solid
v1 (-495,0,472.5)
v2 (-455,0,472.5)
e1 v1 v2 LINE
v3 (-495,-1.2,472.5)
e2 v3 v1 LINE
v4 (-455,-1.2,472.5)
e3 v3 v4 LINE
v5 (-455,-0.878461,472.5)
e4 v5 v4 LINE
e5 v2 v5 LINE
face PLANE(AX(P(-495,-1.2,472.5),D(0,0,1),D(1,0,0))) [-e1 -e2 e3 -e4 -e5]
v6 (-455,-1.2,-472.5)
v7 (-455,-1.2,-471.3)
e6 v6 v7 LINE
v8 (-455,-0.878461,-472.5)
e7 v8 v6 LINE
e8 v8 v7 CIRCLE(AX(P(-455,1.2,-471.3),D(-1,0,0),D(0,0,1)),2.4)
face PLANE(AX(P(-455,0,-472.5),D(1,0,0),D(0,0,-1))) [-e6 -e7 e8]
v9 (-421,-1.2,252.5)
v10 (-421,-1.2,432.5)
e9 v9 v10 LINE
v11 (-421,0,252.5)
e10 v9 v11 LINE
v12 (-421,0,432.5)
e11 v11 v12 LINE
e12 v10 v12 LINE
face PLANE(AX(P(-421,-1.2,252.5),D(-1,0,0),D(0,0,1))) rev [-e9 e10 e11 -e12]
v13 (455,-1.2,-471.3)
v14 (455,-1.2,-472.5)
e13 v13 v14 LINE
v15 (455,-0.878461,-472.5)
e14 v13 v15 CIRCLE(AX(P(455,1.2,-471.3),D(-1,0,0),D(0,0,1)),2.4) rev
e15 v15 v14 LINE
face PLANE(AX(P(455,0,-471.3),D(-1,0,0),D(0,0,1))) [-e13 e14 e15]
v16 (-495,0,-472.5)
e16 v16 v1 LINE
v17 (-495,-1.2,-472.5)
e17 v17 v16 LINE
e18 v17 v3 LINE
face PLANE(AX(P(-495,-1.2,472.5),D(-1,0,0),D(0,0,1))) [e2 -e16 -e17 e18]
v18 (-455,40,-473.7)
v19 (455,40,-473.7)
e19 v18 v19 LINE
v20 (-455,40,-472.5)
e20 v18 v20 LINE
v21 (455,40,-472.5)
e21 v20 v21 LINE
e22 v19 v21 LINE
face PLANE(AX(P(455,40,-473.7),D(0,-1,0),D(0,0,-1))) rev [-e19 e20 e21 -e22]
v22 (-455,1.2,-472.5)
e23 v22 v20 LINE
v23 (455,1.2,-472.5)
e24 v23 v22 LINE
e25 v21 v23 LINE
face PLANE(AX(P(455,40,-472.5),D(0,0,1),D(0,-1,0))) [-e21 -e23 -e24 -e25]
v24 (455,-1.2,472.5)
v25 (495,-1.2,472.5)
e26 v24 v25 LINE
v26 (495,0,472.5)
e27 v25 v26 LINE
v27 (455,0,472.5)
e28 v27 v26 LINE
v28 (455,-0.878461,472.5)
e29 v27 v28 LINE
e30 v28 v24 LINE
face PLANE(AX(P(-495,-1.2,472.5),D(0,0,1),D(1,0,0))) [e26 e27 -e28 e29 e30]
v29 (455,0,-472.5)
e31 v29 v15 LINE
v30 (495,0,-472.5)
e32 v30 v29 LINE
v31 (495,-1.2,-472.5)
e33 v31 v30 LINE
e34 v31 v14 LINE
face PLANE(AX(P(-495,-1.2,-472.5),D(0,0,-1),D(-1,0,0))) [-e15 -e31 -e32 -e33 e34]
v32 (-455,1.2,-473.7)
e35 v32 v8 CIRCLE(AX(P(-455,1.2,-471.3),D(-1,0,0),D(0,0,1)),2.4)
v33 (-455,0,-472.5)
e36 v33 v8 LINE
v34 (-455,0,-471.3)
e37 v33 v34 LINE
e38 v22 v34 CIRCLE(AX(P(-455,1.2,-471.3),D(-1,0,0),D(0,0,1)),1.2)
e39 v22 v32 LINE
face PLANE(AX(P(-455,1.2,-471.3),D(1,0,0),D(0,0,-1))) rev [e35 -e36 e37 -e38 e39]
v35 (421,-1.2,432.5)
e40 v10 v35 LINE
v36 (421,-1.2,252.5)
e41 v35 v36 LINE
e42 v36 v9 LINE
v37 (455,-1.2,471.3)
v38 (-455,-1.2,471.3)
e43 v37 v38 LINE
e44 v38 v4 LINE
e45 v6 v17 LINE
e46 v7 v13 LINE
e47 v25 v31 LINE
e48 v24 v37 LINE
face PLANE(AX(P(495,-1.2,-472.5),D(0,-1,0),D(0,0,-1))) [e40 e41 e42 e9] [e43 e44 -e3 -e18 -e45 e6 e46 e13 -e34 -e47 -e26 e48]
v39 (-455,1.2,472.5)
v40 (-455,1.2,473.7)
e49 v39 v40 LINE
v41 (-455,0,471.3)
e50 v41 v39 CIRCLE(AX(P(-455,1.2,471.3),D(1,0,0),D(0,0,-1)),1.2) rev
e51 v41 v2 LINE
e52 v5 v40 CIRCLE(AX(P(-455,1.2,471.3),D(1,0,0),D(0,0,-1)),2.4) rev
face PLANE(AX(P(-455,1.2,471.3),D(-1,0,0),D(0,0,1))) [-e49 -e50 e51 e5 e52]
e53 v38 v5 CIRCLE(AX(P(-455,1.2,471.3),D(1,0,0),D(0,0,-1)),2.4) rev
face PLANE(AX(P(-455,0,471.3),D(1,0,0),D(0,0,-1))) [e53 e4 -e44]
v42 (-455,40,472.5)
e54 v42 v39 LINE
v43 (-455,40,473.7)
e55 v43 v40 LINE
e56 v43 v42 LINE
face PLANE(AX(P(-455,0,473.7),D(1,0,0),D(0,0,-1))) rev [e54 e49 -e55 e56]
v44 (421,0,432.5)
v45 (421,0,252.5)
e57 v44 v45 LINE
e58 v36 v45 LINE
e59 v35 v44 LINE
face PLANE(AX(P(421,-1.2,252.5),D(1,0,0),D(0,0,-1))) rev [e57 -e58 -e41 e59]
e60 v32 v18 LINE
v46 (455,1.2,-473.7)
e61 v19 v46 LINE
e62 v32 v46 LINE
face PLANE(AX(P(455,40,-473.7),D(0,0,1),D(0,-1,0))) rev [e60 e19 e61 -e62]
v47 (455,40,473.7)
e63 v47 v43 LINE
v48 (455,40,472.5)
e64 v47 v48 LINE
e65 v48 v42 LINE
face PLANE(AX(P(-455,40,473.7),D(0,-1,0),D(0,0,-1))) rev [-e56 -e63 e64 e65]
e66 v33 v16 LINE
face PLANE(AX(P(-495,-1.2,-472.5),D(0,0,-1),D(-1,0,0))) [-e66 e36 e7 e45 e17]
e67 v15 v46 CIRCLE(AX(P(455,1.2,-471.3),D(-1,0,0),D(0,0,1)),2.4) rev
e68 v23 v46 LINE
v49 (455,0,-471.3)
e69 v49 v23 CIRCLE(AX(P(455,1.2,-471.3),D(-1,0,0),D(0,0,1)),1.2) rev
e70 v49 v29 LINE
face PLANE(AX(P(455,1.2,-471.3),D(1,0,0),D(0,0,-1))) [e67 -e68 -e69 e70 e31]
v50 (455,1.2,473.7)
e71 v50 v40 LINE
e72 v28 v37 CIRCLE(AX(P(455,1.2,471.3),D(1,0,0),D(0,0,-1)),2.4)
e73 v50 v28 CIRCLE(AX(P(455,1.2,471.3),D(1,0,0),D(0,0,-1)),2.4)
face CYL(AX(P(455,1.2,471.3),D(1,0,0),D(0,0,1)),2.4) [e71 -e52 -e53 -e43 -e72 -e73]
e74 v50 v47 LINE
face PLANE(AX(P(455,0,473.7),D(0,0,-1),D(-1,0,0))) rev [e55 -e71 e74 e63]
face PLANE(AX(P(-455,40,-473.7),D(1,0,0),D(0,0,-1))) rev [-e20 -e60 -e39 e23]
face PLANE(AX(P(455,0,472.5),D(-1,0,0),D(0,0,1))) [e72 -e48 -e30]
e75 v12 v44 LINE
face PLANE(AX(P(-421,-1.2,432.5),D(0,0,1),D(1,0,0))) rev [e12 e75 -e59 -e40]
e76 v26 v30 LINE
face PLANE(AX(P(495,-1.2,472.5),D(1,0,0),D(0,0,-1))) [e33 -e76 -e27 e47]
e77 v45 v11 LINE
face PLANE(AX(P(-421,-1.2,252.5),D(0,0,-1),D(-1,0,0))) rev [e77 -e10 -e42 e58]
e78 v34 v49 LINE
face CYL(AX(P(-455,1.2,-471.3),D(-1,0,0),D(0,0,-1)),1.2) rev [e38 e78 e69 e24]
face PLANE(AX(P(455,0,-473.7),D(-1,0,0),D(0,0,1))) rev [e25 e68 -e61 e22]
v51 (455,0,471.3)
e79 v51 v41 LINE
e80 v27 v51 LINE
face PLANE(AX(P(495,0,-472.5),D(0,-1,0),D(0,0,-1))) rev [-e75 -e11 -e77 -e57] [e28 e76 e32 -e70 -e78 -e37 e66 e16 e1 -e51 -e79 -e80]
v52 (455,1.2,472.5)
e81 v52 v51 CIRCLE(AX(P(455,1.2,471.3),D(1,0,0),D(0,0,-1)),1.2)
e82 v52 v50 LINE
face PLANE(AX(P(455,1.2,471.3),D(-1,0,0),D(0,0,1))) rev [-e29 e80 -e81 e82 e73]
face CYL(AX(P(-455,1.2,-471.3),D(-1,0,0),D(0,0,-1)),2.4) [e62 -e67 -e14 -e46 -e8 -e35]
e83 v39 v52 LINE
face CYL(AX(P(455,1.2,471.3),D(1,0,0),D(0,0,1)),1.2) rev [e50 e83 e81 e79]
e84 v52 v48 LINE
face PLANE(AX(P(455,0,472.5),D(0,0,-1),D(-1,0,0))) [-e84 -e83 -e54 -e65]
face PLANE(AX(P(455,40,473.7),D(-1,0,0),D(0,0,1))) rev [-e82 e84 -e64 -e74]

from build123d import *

# Parameters (mm, degrees)
SKETCH1_W                    = 990
SKETCH1_H                    = 945
SKETCH1_W_2                  = 842
SKETCH1_H_2                  = 180
BASE_FLANGE1_DEPTH           = 1.2
EDGE_FLANGE1_STRIP_W         = 7.2
EDGE_FLANGE1_STRIP_H         = 1.2
EDGE_FLANGE1_STRIP_CUT_DEPTH = 910
EDGE_FLANGE1_DEPTH           = 910
EDGE_FLANGE2_STRIP_W         = 7.2
EDGE_FLANGE2_STRIP_H         = 1.2
EDGE_FLANGE2_STRIP_CUT_DEPTH = 910
EDGE_FLANGE2_DEPTH           = 910


# Sheet-metal steps are written as plain solids
with BuildPart() as part:
    # Sketch1 → Base-Flange1 (new body)
    with BuildSketch(Plane(origin=(0, 0, 0), x_dir=(1, 0, 0), z_dir=(0, 1, 0))):
        Rectangle(SKETCH1_W, SKETCH1_H)
        with Locations((0, -342.5)):
            Rectangle(SKETCH1_W_2, SKETCH1_H_2, mode=Mode.SUBTRACT)
    extrude(amount=-BASE_FLANGE1_DEPTH)

    # Edge-Flange1 strip (across the edge) → Edge-Flange1 strip cut (cut)
    with BuildSketch(Plane(origin=(455, 0, -472.5), x_dir=(0, 0, 1), z_dir=(-1, 0, 0))):
        with Locations((-2.4, -0.6)):
            Rectangle(EDGE_FLANGE1_STRIP_W, EDGE_FLANGE1_STRIP_H)
    extrude(amount=EDGE_FLANGE1_STRIP_CUT_DEPTH, mode=Mode.SUBTRACT)

    # Edge-Flange1 section (across the edge) → Edge-Flange1 (add)
    with BuildSketch(Plane(origin=(455, 0, -472.5), x_dir=(0, 0, 1), z_dir=(-1, 0, 0))):
        with BuildLine():
            Line((-1.2, 1.2), (-1.2, 40))
            Line((-1.2, 40), (0, 40))
            Line((0, 40), (0, 1.2))
            ThreePointArc((0, 1.2), (0.351471863, 0.351471863), (1.2, 0))
            Line((1.2, 0), (1.2, -1.2))
            ThreePointArc((1.2, -1.2), (-0.497056275, -0.497056275), (-1.2, 1.2))
        make_face()
    extrude(amount=EDGE_FLANGE1_DEPTH)

    # Edge-Flange2 strip (across the edge) → Edge-Flange2 strip cut (cut)
    with BuildSketch(Plane(origin=(-455, 0, 472.5), x_dir=(0, 0, -1), z_dir=(1, 0, 0))):
        with Locations((-2.4, -0.6)):
            Rectangle(EDGE_FLANGE2_STRIP_W, EDGE_FLANGE2_STRIP_H)
    extrude(amount=EDGE_FLANGE2_STRIP_CUT_DEPTH, mode=Mode.SUBTRACT)

    # Edge-Flange2 section (across the edge) → Edge-Flange2 (add)
    with BuildSketch(Plane(origin=(-455, 0, 472.5), x_dir=(0, 0, -1), z_dir=(1, 0, 0))):
        with BuildLine():
            Line((-1.2, 1.2), (-1.2, 40))
            Line((-1.2, 40), (0, 40))
            Line((0, 40), (0, 1.2))
            ThreePointArc((0, 1.2), (0.351471863, 0.351471863), (1.2, 0))
            Line((1.2, 0), (1.2, -1.2))
            ThreePointArc((1.2, -1.2), (-0.497056275, -0.497056275), (-1.2, 1.2))
        make_face()
    extrude(amount=EDGE_FLANGE2_DEPTH)


solid = part.part
